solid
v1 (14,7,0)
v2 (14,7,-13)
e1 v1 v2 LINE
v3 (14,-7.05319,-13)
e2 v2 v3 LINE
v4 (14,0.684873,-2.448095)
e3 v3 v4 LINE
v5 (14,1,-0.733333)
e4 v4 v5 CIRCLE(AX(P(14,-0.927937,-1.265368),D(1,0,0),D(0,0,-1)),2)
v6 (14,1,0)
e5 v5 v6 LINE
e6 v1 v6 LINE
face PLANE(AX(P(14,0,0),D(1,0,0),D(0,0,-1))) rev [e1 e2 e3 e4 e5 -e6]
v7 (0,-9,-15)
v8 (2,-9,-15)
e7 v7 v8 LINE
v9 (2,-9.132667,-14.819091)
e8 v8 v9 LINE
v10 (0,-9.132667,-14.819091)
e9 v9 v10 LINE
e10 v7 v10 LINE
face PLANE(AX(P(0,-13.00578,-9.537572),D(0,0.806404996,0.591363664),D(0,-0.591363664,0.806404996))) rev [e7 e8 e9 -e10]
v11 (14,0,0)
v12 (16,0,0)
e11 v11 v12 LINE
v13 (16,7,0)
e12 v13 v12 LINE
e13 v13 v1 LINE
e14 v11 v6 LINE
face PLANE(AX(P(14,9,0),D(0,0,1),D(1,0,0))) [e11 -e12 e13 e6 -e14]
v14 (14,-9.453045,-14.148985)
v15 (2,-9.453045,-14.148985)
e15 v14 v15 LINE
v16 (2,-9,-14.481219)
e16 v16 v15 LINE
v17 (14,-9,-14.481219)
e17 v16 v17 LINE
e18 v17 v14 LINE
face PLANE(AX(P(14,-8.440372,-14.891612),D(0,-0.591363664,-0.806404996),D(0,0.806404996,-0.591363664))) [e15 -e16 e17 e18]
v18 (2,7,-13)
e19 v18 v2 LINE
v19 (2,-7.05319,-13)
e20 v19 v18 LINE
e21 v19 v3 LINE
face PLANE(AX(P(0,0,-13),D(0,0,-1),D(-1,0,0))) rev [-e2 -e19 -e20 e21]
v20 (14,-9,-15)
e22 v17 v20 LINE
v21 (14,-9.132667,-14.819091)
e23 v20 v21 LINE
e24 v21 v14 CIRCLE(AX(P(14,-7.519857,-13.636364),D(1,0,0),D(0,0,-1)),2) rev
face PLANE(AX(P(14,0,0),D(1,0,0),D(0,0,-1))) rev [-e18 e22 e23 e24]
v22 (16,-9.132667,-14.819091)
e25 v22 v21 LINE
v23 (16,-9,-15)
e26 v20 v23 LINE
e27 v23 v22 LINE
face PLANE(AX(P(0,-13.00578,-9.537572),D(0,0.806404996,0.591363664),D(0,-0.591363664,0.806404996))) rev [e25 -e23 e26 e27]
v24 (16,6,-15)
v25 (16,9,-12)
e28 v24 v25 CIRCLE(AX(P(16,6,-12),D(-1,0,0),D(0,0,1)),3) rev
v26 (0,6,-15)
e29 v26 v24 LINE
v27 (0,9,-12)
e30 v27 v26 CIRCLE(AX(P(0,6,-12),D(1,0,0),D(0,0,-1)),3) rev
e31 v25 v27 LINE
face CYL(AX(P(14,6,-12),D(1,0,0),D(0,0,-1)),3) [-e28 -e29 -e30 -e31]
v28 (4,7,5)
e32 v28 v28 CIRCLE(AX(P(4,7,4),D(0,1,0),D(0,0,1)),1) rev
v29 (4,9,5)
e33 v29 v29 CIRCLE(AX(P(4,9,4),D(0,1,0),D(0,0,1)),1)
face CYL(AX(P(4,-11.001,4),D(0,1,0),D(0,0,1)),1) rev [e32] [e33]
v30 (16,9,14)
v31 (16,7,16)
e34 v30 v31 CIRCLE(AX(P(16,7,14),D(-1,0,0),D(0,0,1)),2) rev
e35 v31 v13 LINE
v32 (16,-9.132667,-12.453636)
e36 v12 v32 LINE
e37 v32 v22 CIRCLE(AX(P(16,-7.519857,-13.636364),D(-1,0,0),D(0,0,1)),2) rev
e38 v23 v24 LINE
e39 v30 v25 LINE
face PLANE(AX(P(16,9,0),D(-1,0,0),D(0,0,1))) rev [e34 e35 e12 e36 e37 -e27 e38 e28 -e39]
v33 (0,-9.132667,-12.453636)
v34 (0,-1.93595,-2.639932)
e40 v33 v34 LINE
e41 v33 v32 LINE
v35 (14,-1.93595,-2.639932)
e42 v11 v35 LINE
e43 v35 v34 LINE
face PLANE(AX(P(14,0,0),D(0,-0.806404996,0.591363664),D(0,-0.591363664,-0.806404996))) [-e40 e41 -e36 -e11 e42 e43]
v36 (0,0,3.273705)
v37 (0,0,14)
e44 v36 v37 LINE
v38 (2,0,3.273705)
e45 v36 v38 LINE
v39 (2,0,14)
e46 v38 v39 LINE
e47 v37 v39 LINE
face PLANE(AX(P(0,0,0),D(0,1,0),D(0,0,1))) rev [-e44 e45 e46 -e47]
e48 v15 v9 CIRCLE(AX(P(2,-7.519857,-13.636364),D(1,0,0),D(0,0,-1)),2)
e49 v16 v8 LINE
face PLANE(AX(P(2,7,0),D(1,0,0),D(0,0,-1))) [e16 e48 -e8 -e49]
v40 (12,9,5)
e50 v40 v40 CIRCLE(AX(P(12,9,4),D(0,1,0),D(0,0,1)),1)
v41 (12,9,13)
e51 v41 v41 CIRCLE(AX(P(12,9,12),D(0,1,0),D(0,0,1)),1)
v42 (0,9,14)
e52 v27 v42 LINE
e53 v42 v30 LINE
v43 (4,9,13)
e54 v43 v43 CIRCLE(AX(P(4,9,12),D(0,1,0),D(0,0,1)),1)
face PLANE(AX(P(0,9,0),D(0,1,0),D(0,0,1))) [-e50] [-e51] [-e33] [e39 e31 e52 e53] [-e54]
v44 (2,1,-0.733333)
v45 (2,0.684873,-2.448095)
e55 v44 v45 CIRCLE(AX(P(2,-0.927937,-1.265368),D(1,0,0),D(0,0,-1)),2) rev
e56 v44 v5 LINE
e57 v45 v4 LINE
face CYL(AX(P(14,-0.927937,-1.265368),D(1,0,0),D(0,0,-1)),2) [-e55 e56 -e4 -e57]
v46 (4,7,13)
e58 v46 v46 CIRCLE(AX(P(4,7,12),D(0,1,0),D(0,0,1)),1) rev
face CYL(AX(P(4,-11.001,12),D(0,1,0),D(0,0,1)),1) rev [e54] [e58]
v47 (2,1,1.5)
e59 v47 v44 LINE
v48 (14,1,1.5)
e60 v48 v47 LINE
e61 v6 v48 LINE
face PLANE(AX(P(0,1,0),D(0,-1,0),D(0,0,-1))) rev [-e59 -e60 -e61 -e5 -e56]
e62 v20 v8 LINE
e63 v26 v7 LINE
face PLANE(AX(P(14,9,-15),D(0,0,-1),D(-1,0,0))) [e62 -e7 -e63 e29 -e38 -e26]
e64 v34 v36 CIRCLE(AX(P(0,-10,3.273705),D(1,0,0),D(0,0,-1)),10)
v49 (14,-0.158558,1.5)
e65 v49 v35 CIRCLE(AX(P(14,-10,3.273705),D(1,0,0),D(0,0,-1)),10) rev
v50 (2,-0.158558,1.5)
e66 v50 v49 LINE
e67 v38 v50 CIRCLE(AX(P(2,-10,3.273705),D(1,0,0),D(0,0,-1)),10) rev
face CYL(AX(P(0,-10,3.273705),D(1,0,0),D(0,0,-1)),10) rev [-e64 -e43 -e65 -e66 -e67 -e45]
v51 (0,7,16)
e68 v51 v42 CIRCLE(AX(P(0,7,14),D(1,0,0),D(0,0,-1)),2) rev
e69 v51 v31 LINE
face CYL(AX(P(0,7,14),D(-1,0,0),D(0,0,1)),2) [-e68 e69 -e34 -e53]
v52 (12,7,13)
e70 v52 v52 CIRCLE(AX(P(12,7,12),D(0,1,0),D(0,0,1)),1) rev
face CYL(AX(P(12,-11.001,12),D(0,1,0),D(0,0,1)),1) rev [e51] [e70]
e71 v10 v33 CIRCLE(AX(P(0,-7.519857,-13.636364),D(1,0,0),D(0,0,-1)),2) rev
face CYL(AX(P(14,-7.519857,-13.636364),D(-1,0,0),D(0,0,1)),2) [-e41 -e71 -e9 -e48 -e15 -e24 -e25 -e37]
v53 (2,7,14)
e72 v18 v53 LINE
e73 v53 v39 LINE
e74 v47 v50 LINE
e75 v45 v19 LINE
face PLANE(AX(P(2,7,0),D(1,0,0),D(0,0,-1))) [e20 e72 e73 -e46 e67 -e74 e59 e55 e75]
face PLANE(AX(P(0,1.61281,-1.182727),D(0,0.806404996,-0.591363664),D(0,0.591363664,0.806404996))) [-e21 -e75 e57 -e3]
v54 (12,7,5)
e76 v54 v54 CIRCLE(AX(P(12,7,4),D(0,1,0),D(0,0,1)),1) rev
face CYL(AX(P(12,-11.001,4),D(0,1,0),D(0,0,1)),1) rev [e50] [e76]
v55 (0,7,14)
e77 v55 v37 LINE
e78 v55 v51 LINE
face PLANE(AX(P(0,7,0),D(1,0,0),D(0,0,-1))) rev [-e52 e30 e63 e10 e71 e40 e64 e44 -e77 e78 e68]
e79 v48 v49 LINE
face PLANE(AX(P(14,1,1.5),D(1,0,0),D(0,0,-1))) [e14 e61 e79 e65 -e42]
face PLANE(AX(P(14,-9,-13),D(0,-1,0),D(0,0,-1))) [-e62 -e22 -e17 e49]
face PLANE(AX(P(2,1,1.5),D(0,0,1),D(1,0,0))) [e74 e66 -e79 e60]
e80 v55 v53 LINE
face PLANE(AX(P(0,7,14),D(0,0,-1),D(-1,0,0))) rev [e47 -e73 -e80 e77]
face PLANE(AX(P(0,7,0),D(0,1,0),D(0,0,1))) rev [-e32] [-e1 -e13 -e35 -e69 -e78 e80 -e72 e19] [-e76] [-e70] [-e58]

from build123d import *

# Parameters (mm, degrees)
SKETCH1_W           = 2
SKETCH1_H           = 14
BOSS_EXTRUDE1_DEPTH = 7
SKETCH2_W           = 16
SKETCH2_H           = 16
BOSS_EXTRUDE2_DEPTH = 2
BOSS_EXTRUDE3_DEPTH = 2
BOSS_EXTRUDE4_DEPTH = 2
SKETCH6_W           = 12
SKETCH6_H           = 15
BOSS_EXTRUDE5_DEPTH = 2
SKETCH7_W           = 12
SKETCH7_H           = 16
BOSS_EXTRUDE6_DEPTH = 2
SKETCH8_W           = 12
SKETCH8_H           = 17
BOSS_EXTRUDE7_DEPTH = 2
SKETCH9_W           = 12
SKETCH9_H           = 3.5
BOSS_EXTRUDE9_DEPTH = 1
FILLET1_R           = 3
FILLET2_R           = 10
FILLET3_R           = 2
CUT_EXTRUDE4_REACH  = 32.199
SKETCH14_R          = 1
FILLET4_R           = 2
CUT_EXTRUDE5_DEPTH  = 26.159491251
FILLET5_R           = 2


# Some blends are built 0.0001 mm under size
with BuildPart() as part:
    # Sketch1 → Boss-Extrude1 (new body)
    with BuildSketch(Plane(origin=(0, 0, 0), x_dir=(1, 0, 0), z_dir=(0, 1, 0))):
        with Locations((1, -7)):
            Rectangle(SKETCH1_W, SKETCH1_H)
    extrude(amount=BOSS_EXTRUDE1_DEPTH)

    # Sketch2 → Boss-Extrude2 (add)
    with BuildSketch(Plane(origin=(0, 7, 0), x_dir=(1, 0, 0), z_dir=(0, 1, 0))):
        with Locations((8, -8)):
            Rectangle(SKETCH2_W, SKETCH2_H)
    extrude(amount=BOSS_EXTRUDE2_DEPTH)

    # Sketch4 → Boss-Extrude3 (add)
    with BuildSketch(Plane(origin=(16, 0, 0), x_dir=(0, 0, -1), z_dir=(1, 0, 0))):
        Polygon((0, 0), (15, -11), (15, 9), (0, 9), align=None)
    extrude(amount=-BOSS_EXTRUDE3_DEPTH)

    # Sketch5 → Boss-Extrude4 (add)
    with BuildSketch(Plane.ZY):
        Polygon((0, 9), (-15, 9), (-15, -11), (0, 0), align=None)
    extrude(amount=-BOSS_EXTRUDE4_DEPTH)

    # Sketch6 → Boss-Extrude5 (add)
    with BuildSketch(Plane(origin=(0, 9, 0), x_dir=(1, 0, 0), z_dir=(0, 1, 0))):
        with Locations((8, 7.5)):
            Rectangle(SKETCH6_W, SKETCH6_H)
    extrude(amount=-BOSS_EXTRUDE5_DEPTH)

    # Sketch7 → Boss-Extrude6 (add)
    with BuildSketch(Plane(origin=(0, 0, -15), x_dir=(-1, 0, 0), z_dir=(0, 0, -1))):
        with Locations((-8, -1)):
            Rectangle(SKETCH7_W, SKETCH7_H)
    extrude(amount=-BOSS_EXTRUDE6_DEPTH)

    # Sketch8 → Boss-Extrude7 (add)
    with BuildSketch(Plane(origin=(0, 0, 0), x_dir=(1, 0, 0), z_dir=(0, -0.8064049958557057, 0.5913636636275174))):
        with Locations((8, -8.5)):
            Rectangle(SKETCH8_W, SKETCH8_H)
    extrude(amount=-BOSS_EXTRUDE7_DEPTH)

    # Sketch9 → Boss-Extrude9 (add)
    with BuildSketch(Plane.XZ):
        with Locations((8, -0.25)):
            Rectangle(SKETCH9_W, SKETCH9_H)
    extrude(amount=-BOSS_EXTRUDE9_DEPTH)

    # Fillet1
    fillet1_edges = [part.edges().sort_by_distance(p)[0] for p in [
        (8, 9, -15),
    ]]
    fillet(fillet1_edges, radius=FILLET1_R)

    # Fillet2
    # the kernel refuses this fillet: 10 mm, written as the material it adds along each edge
    with BuildSketch(Plane(origin=(0, 0, 0), x_dir=(0, -0.5913636636275174, -0.8064049958557056), z_dir=(1, 0, 0))) as fillet2_piece_1_section:
        with BuildLine():
            CenterArc((FILLET2_R * 0.327370476158, -FILLET2_R), FILLET2_R, 90, 36.253837737)
            Line((-FILLET2_R * 0.263993187469, -FILLET2_R * 0.193595004144), (0, 0))
            Line((0, 0), (FILLET2_R * 0.327370476158, 0))
        make_face()
    fillet2_piece_1 = extrude(amount=14, mode=Mode.PRIVATE)
    fillet2_piece_1 = split(fillet2_piece_1, bisect_by=Plane(origin=(1, -0.664008542, 1.5), z_dir=(0, 0, -1)), keep=Keep.TOP, mode=Mode.PRIVATE)
    add(fillet2_piece_1)
    with BuildSketch(Plane(origin=(0, 0, 0), x_dir=(0, -0.5913636636275174, -0.8064049958557056), z_dir=(1, 0, 0))) as fillet2_piece_2_section:
        with BuildLine():
            CenterArc((FILLET2_R * 0.327370476158, -FILLET2_R), FILLET2_R, 90, 36.253837737)
            Line((-FILLET2_R * 0.263993187469, -FILLET2_R * 0.193595004144), (0, 0))
            Line((0, 0), (FILLET2_R * 0.327370476158, 0))
        make_face()
    fillet2_piece_2 = extrude(amount=22.184261904, mode=Mode.PRIVATE)
    fillet2_piece_2 = split(fillet2_piece_2, bisect_by=Plane(origin=(2, -0.047502187, 1.942720069), z_dir=(-1, 0, 0)), keep=Keep.TOP, mode=Mode.PRIVATE)
    add(fillet2_piece_2)

    # Fillet3
    fillet3_edges = [part.edges().sort_by_distance(p)[0] for p in [
        (8, 9, 16),
    ]]
    fillet(fillet3_edges, radius=FILLET3_R - 0.0001)  # a hair under: the kernel refuses the full size

    # Sketch14 → Cut-Extrude4 (cut, up to next)
    with BuildSketch(Plane(origin=(0, 9, 0), x_dir=(1, 0, 0), z_dir=(0, 1, 0)), mode=Mode.PRIVATE) as cut_extrude4_sk1:
        with Locations(Location((4, -12, 0), (0, 0, 270))):
            Circle(SKETCH14_R)
    cut_extrude4_tool1 = extrude(cut_extrude4_sk1.sketch, amount=-CUT_EXTRUDE4_REACH, mode=Mode.PRIVATE) & part.part
    # Sketch14 → Cut-Extrude4 (cut, up to next)
    with BuildSketch(Plane(origin=(0, 9, 0), x_dir=(1, 0, 0), z_dir=(0, 1, 0)), mode=Mode.PRIVATE) as cut_extrude4_sk2:
        with Locations(Location((4, -4, 0), (0, 0, 270))):
            Circle(SKETCH14_R)
    cut_extrude4_tool2 = extrude(cut_extrude4_sk2.sketch, amount=-CUT_EXTRUDE4_REACH, mode=Mode.PRIVATE) & part.part
    # Sketch14 → Cut-Extrude4 (cut, up to next)
    with BuildSketch(Plane(origin=(0, 9, 0), x_dir=(1, 0, 0), z_dir=(0, 1, 0)), mode=Mode.PRIVATE) as cut_extrude4_sk3:
        with Locations(Location((12, -12, 0), (0, 0, 270))):
            Circle(SKETCH14_R)
    cut_extrude4_tool3 = extrude(cut_extrude4_sk3.sketch, amount=-CUT_EXTRUDE4_REACH, mode=Mode.PRIVATE) & part.part
    # Sketch14 → Cut-Extrude4 (cut, up to next)
    with BuildSketch(Plane(origin=(0, 9, 0), x_dir=(1, 0, 0), z_dir=(0, 1, 0)), mode=Mode.PRIVATE) as cut_extrude4_sk4:
        with Locations(Location((12, -4, 0), (0, 0, 270))):
            Circle(SKETCH14_R)
    cut_extrude4_tool4 = extrude(cut_extrude4_sk4.sketch, amount=-CUT_EXTRUDE4_REACH, mode=Mode.PRIVATE) & part.part
    add(cut_extrude4_tool1.solids().sort_by_distance((4, 9, 12))[0], mode=Mode.SUBTRACT)
    add(cut_extrude4_tool2.solids().sort_by_distance((4, 9, 4))[0], mode=Mode.SUBTRACT)
    add(cut_extrude4_tool3.solids().sort_by_distance((12, 9, 12))[0], mode=Mode.SUBTRACT)
    add(cut_extrude4_tool4.solids().sort_by_distance((12, 9, 4))[0], mode=Mode.SUBTRACT)

    # Fillet4
    # the kernel refuses this fillet: 2 mm, written as the material it takes off along each edge
    with BuildSketch(Plane(origin=(14, 1.612809992, -1.182727327), x_dir=(0, -0.5913636636275179, -0.806404995855705), z_dir=(-1, 0, 0))) as fillet4_piece_1:
        with BuildLine():
            CenterArc((1.569146973, 2), FILLET4_R, 218.318751839, 51.681248161)
            Line((0, 0.759928317), (-0.031382939, 0.735126884))
            ThreePointArc((-0.031382939, 0.735126884), (-0.04, 0.379964159), (-0.04, 0))
            Line((-0.04, 0), (0, -0.04))
            Line((0, -0.04), (1.569146973, -0.04))
            Line((1.569146973, -0.04), (1.569146973, 0))
        make_face()
    extrude(amount=12, mode=Mode.SUBTRACT)

    # Sketch15 → Cut-Extrude5 (cut, through all)
    with BuildSketch(Plane(origin=(16, 0, 0), x_dir=(0, 0, -1), z_dir=(1, 0, 0))):
        Polygon((13.636363636, -10), (15, -11), (15, -9), align=None)
    extrude(amount=-CUT_EXTRUDE5_DEPTH, mode=Mode.SUBTRACT)

    # Fillet5
    # the kernel refuses this fillet: 2 mm, written as the material it takes off along each edge
    with BuildSketch(Plane(origin=(19.666666667, -10, -13.636363636), x_dir=(0, 0.5913636636275166, 0.806404995855706), z_dir=(-1, 0, 0))) as fillet5_piece_1:
        with BuildLine():
            CenterArc((FILLET5_R * 0.733333333333, FILLET5_R), FILLET5_R, 197.492324525, 72.507675475)
            Line((-FILLET5_R * 0.2204238921, FILLET5_R * 0.699421965318), (0, 0))
            Line((0, 0), (FILLET5_R * 0.733333333333, 0))
        make_face()
    extrude(amount=23.333333333, mode=Mode.SUBTRACT)


solid = part.part
